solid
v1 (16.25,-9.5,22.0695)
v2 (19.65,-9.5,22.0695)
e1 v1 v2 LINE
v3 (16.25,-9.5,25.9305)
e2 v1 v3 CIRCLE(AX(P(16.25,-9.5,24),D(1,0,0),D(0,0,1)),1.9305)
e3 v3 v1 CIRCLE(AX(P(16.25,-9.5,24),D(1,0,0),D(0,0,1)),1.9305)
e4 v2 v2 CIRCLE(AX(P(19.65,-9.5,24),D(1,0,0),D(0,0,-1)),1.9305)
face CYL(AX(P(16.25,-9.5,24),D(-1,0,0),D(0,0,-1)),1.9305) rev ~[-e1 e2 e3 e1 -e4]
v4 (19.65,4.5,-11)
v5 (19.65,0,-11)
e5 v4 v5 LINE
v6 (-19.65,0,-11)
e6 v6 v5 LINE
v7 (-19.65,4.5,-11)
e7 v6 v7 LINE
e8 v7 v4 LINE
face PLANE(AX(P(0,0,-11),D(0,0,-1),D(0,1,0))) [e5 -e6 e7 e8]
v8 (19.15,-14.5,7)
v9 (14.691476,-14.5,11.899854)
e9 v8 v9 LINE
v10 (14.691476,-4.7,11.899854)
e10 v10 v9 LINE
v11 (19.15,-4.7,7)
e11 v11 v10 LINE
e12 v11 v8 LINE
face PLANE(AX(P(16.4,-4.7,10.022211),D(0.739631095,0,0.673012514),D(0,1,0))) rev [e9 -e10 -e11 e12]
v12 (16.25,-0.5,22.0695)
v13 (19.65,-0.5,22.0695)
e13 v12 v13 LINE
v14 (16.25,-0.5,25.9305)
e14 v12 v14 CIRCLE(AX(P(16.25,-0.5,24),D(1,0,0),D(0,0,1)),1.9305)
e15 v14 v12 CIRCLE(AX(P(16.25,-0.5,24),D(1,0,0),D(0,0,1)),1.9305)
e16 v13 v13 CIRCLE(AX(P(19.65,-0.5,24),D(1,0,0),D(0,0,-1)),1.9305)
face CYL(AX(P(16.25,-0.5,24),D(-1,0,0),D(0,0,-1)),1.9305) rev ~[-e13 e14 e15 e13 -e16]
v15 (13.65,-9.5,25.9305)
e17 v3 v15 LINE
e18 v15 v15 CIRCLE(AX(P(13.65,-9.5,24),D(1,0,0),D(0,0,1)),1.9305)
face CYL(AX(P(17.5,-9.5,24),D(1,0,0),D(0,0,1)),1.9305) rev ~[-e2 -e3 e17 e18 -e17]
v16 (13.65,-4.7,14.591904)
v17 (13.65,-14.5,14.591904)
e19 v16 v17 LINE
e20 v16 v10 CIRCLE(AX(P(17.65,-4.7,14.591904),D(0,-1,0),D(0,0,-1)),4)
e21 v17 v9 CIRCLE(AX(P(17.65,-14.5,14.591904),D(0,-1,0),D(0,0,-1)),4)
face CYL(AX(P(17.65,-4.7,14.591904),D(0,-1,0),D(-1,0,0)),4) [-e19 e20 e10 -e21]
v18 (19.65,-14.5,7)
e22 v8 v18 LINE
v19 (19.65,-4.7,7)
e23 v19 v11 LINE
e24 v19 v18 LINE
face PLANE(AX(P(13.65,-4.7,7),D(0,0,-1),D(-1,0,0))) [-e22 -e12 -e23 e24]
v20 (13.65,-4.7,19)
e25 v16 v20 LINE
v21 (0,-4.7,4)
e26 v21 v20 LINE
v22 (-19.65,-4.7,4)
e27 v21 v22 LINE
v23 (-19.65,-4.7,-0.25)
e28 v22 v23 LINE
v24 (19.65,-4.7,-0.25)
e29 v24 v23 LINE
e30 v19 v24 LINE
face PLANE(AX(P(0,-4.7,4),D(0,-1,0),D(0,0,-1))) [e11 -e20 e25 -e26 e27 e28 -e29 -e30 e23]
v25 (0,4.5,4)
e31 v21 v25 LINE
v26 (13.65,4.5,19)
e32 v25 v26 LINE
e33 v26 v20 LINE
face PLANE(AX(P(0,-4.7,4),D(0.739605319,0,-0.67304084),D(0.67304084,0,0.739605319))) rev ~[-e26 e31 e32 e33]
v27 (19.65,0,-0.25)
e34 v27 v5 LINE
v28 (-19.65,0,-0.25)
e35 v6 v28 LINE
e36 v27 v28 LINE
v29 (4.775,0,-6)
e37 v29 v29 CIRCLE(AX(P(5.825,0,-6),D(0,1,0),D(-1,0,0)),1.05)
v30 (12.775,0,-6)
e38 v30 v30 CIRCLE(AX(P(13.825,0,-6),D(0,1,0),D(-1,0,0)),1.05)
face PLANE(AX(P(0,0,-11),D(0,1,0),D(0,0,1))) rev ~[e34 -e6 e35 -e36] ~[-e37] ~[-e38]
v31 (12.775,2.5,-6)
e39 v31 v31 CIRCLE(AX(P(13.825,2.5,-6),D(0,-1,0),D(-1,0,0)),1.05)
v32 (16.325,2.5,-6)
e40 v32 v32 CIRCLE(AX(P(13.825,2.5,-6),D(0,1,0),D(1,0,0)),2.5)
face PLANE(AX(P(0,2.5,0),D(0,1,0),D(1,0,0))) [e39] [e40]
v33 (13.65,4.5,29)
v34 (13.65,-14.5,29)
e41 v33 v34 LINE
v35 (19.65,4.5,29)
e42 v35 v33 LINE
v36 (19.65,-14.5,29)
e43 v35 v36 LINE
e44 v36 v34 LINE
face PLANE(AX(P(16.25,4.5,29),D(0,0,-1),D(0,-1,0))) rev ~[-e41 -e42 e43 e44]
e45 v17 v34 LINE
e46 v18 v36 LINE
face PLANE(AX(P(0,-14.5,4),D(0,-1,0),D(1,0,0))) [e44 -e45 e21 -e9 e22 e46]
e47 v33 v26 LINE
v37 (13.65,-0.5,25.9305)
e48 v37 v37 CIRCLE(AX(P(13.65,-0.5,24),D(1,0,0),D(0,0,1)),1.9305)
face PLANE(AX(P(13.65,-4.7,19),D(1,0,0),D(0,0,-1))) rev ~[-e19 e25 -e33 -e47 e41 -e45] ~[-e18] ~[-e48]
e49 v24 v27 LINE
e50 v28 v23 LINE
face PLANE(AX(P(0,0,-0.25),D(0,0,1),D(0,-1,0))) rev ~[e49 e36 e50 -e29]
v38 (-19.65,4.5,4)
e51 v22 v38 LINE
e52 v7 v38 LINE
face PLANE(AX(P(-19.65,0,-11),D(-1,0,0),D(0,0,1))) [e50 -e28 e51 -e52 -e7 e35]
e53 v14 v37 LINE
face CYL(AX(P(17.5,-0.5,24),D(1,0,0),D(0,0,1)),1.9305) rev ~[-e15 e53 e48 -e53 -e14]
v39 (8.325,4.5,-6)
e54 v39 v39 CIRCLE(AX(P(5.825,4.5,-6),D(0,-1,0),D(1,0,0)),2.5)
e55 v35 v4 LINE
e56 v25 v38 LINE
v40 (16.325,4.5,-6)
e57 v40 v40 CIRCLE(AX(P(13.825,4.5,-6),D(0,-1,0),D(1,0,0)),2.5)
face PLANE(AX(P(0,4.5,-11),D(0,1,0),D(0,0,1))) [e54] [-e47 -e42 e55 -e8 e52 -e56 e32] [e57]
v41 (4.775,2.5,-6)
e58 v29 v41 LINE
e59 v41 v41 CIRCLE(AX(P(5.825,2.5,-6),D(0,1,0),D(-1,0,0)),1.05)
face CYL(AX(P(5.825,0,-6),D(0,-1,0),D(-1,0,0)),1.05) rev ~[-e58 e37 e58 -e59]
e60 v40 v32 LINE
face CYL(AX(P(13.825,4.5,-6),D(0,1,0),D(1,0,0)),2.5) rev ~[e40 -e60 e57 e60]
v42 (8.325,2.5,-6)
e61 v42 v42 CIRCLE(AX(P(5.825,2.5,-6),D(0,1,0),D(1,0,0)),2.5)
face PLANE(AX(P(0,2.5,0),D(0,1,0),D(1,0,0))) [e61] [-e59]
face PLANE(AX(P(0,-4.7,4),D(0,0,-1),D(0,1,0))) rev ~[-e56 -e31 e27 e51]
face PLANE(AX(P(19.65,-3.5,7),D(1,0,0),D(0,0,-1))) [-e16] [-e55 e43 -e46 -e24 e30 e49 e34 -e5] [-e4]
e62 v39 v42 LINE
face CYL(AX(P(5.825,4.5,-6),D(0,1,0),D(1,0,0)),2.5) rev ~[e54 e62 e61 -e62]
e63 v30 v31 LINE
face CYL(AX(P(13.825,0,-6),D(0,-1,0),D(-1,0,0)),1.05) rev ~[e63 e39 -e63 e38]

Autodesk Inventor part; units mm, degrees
ref_plane "YZ Plane" through (0, 0, 0) normal (1, 0, 0) x (0, 1, 0)
ref_plane "XZ Plane" through (0, 0, 0) normal (0, 1, 0) x (-1, 0, 0)
ref_plane "XY Plane" through (0, 0, 0) normal (0, 0, 1) x (1, 0, 0)
sketch "Sketch1" plane through (0, 0, 0) normal (0, 1, 0) x (-1, 0, 0)
  line L0 (0, 0) -> (-19.65, 0)
  line L1 (-19.65, 0) -> (-19.65, -12)
  line L2 (-19.65, -12) -> (0, -12)
  line L3 (0, -12) -> (0, 0)
  line L4 (0, 0) -> (0, -6)
  line L5 (0, -6) -> (-5.825, -6)
  line L6 (-5.825, -6) -> (-13.825, -6)
  circle A0 centre (-5.825, -6) radius 1.05
  circle A1 centre (-13.825, -6) radius 1.05
  dimension "d0" = 19.65
  dimension "d1" = 12
  dimension "d2" = 6
  dimension "d3" = 5.825
  dimension "d4" = 8
  dimension "d5" = 2.1
  dimension "d6" = 2.1
extrude "Extrusion1" add sketch "Sketch1" along normal blind 4.5
sketch "Sketch2" plane through (0, 4.5, 0) normal (0, 1, 0) x (1, 0, 0)
  line L0 (0, 0) -> (19.65, 0) projected
  line L1 (0, 0) -> (0, 6)
  line L2 (0, 12) -> (0, 0) projected
  line L3 (0, 6) -> (5.825, 6)
  line L4 (5.825, 6) -> (13.825, 6)
  circle A0 centre (5.825, 6) radius 2.5
  circle A1 centre (13.825, 6) radius 2.5
  dimension "d9" = 5.825
  dimension "d10" = 8
  dimension "d11" = 5
  dimension "d12" = 5
extrude "Extrusion2" cut sketch "Sketch2" against normal blind 2
sketch "Sketch3" plane through (0, 4.5, 0) normal (0, 1, 0) x (1, 0, 0)
  line L0 (19.65, 12) -> (0, 12) projected
  line L1 (0, 0) -> (3, 0)
  line L2 (3, 0) -> (3, 12)
  line L3 (3, 12) -> (0, 12)
  line L4 (0, 12) -> (0, 0)
  dimension "d15" = 3
extrude "Extrusion3" add sketch "Sketch3" along normal blind 11.5
sketch "Sketch4" plane through (0, 16, 0) normal (0, 1, 0) x (1, 0, 0)
  line L0 (0, 0) -> (3, 0) projected
  line L1 (0, 0) -> (3, 0)
  line L2 (3, 0) -> (3, 1)
  line L3 (3, 0) -> (3, 12) projected
  line L4 (3, 1) -> (2, 1)
  line L5 (2, 1) -> (2, 11)
  line L6 (2, 11) -> (3, 11)
  line L7 (3, 1) -> (3, 11)
  dimension "d18" = 1
  dimension "d19" = 1
  dimension "d20" = 10
extrude "Extrusion4" cut sketch "Sketch4" against normal blind 11.5
sketch "Sketch6" plane through (0, 0, 0) normal (0, 0, 1) x (1, 0, 0)
  line L0 (0, 0) -> (19.65, 0) projected
  line L1 (0, 0) -> (5, 0)
  line L2 (5, 0) -> (5, 4.5)
  line L3 (3.325, 4.5) -> (8.325, 4.5) projected
  line L4 (19.65, 0) -> (19.65, 4.5) projected
  line L5 (19.65, 4.5) -> (19.65, 0)
  line L6 (19.65, 0) -> (5, 0)
  line L7 (5, 4.5) -> (19.65, 4.5)
  line L8 (19.65, 0) -> (5, 0)
  line L9 (19.65, 4.5) -> (19.65, -3.5)
  line L10 (5, 4.5) -> (-3, 4.5)
  line L11 (3, 4.5) -> (19.65, 4.5) projected
  line L12 (5, 4.5) -> (5, -3.5)
  line L13 (5, -3.5) -> (19.65, -3.5)
  dimension "d24" = 5
  dimension "d25" = 8
  dimension "d26" = 8
  dimension "d27" = 8
extrude "Extrusion5" add sketch "Sketch6" along normal blind 2
sketch "Sketch7" plane through (0, 0, 2) normal (0, 0, 1) x (1, 0, 0)
  line L0 (5, 0) -> (5, -3.5) projected
  line L1 (5, -3.5) -> (11, -3.5)
  line L2 (11, -3.5) -> (11, 4.5)
  line L3 (11, 4.5) -> (5, 4.5)
  line L4 (5, 4.5) -> (5, -3.5)
  line L5 (5, -3.5) -> (19.65, -3.5) projected
  line L6 (5, -3.5) -> (11, -3.5)
  line L7 (11, -3.5) -> (11, -14.5)
  line L8 (11, -14.5) -> (5, -14.5)
  line L9 (5, -14.5) -> (5, -3.5)
  point P0 (0, 0)
  dimension "d30" = 6
  dimension "d31" = 8
  dimension "d32" = 6
  dimension "d33" = 11
extrude "Extrusion6" add sketch "Sketch7" along normal blind 27
sketch "Sketch8" plane through (11, -14.5, 2) normal (1, 0, 0) x (0, 0, -1)
  line L0 (0, 11) -> (0, 0) projected
  line L1 (0, 0) -> (-27, 0)
  line L2 (0, 0) -> (-27, 0) projected
  line L3 (-27, 0) -> (-27, 5)
  line L4 (2, 19) -> (-27, 19) projected
  circle A0 centre (-27, 5) radius 2
  line L5 (0, 19) -> (-27, 19)
  line L6 (-27, 19) -> (-27, 14)
  circle A1 centre (-27, 14) radius 2
  line L7 (-27, 14) -> (-22, 14)
  line L8 (-27, 5) -> (-22, 5)
  circle A2 centre (-22, 14) radius 1.9305
  circle A3 centre (-22, 5) radius 1.9305
  point P0 (2, 14.5)
  point P1 (-25, 14)
  point P2 (-27, 16)
  point P3 (-25, 5)
  point P4 (-27, 3)
  dimension "d36" = 27
  dimension "d37" = 5
  dimension "d39" = 4
  dimension "d41" = 27
  dimension "d42" = 5
  dimension "d43" = 4
  dimension "d44" = 5
  dimension "d45" = 5
  dimension "d46" = 3.861
  dimension "d47" = 3.861
sketch "Sketch10" plane through (11, -14.5, 2) normal (1, 0, 0) x (0, 0, -1)
  line L0 (0, 0) -> (-27, 0) projected
  line L1 (0, 0) -> (-5, 0)
  line L2 (-5, 0) -> (-5, 11)
  line L3 (-5, 11) -> (0, 11)
  line L4 (0, 11) -> (0, 0)
  point P0 (2, 14.5)
  point P1 (-5, 0)
  dimension "d52" = 5
  dimension "d53" = 11
extrude "Extrusion9" cut sketch "Sketch10" against normal blind 20
sketch "Sketch11" plane through (11, -3.5, 2) normal (1, 0, 0) x (0, 0, -1)
  line L0 (-27, 8) -> (0, 8)
  line L1 (0, 8) -> (0, -11)
  line L2 (0, -11) -> (-27, -11)
  line L3 (-27, -11) -> (-27, 8)
  line L4 (-5, 0) -> (0, 0) projected
  line L5 (-5, 0) -> (0, 0)
  line L6 (0, 0) -> (0, -11)
  line L7 (0, -11) -> (-5, -11)
  line L8 (-5, -11) -> (-5, 0)
  point P0 (2, 3.5)
  dimension "d56" = 27
  dimension "d57" = 19
extrude "Extrusion10" add sketch "Sketch11" along normal blind 16 contours L0 L1 L4 L8 L2 L3
sketch "Sketch13" plane through (5, -3.5, 0) normal (-1, 0, 0) x (0, 0, 1)
  line L0 (0, 3.5) -> (0, 8) projected
  line L1 (0, 8) -> (30.196, 8)
  line L2 (30.196, 8) -> (30.196, -11.8084)
  line L3 (30.196, -11.8084) -> (0, -11.8084)
  line L4 (0, -11.8084) -> (0, 8)
extrude "Extrusion12" cut sketch "Sketch13" against normal blind 12.5
extrude "Extrusion13" cut sketch "Sketch8" along normal blind 30 contours A2 | A3
sketch "Sketch14" plane through (0, 0, -12) normal (-1, 0, 0) x (0, 0, 1)
  line L0 (12, 4.5) -> (12, 16) projected
  line L1 (12, 4.5) -> (16, 4.5)
  line L2 (14, 4.5) -> (41, 4.5) projected
  line L3 (12, 4.5) -> (12, 0) projected
  line L4 (16, 4.5) -> (12, 4.5)
  line L5 (12, 4.5) -> (12, 0)
  line L6 (12, 0) -> (16, 0)
  line L7 (16, 0) -> (16, 4.5)
  line L8 (16, 0) -> (12, 0)
  line L9 (12, 0) -> (12, -3.5)
  line L10 (12, -3.5) -> (16, -3.5)
  line L11 (16, -3.5) -> (16, 0)
  dimension "d68" = 4
  dimension "d69" = 3.5
extrude "Extrusion14" add sketch "Sketch14" against normal blind 27
sketch "Sketch15" plane through (27, -3.5, 2) normal (1, 0, 0) x (0, 0, -1)
  line L0 (-27.7224, 9.1153) -> (2, 9.1153)
  line L1 (2, 9.1153) -> (2, -11.9629)
  line L2 (2, -11.9629) -> (-27.7224, -11.9629)
  line L3 (-27.7224, -11.9629) -> (-27.7224, 9.1153)
  point P0 (2, 3.5)
extrude "Extrusion15" cut sketch "Sketch15" against normal blind 3.5
sketch "Sketch16" plane through (0, 0, 0) normal (0, 0, -1) x (-1, 0, 0)
  line L0 (-23.5, 4.5) -> (-23.5, -3.5) projected
  line L1 (-19.65, 0) -> (0, 0) projected
  line L2 (-23.5, 4.5) -> (-19.65, 4.5)
  line L3 (-19.65, 4.5) -> (-19.65, 0)
  line L4 (-19.65, 0) -> (-23.5, 0)
  line L5 (-23.5, 0) -> (-23.5, 4.5)
  line L6 (0, -3.5) -> (-23.5, -3.5) projected
  line L7 (-23.5, -3.5) -> (0, -3.5)
  line L8 (0, -3.5) -> (0, 0)
  line L9 (0, 0) -> (-23.5, 0)
  line L10 (-23.5, 0) -> (-23.5, -3.5)
extrude "Extrusion16" cut sketch "Sketch16" against normal blind 0.25
chamfer "Chamfer2" distance 11.5 angle 22.5 1 edges at (3, 4.5, -0.5) measured on face at (3, 8.3333, -0.6667)
chamfer "Chamfer3" distance 11.5 angle 22.5 1 edges at (3, 4.5, -11.5) measured on face at (3, 8.3333, -11.3333)
sketch "Sketch17" plane through (17.5, -3.5, 0) normal (-1, 0, 0) x (0, 0, 1)
  line L0 (4, 8) -> (0, 8) projected
  line L1 (4, 8) -> (29, 8) projected
  line L2 (4, 8) -> (29, 8)
  line L3 (29, -11) -> (7, -11) projected
  line L4 (29, 8) -> (29, -11)
  line L5 (29, -11) -> (7, -11)
  line L6 (7, -11) -> (7, 0) projected
  line L7 (7, -11) -> (7, 0)
  line L8 (7, 0) -> (4, 0) projected
  line L9 (7, 0) -> (4, 0)
  line L10 (4, 0) -> (4, 8) projected
  line L11 (4, 0) -> (4, 8)
  circle A0 centre (24, 3) radius 1.9305 projected
  circle A1 centre (24, 3) radius 1.9305
  circle A2 centre (24, -6) radius 1.9305 projected
  circle A3 centre (24, -6) radius 1.9305
  point P0 (0, 3.5)
extrude "Extrusion17" add sketch "Sketch17" along normal blind 7.75
sketch "Sketch19" plane through (19.65, 0, -12) normal (1, 0, 0) x (0, 0, -1)
  line L0 (3.0047, 17.6779) -> (-43.6886, 17.6779)
  line L1 (-43.6886, 17.6779) -> (-43.6886, -24.1526)
  line L2 (-43.6886, -24.1526) -> (3.0047, -24.1526)
  line L3 (3.0047, -24.1526) -> (3.0047, 17.6779)
  point P0 (-12, 0)
extrude "Extrusion18" cut sketch "Sketch19" along normal blind 7.75
sketch "Sketch20" plane through (19.65, 0, -12) normal (1, 0, 0) x (0, 0, -1)
  line L0 (-16, -3.5) -> (-19, -3.5) projected
  line L1 (-41, 4.5) -> (-16, 4.5) projected
  line L2 (-16, -3.5) -> (-41, -3.5)
  line L3 (-41, -3.5) -> (-41, 4.5)
  line L4 (-41, 4.5) -> (-16, 4.5)
  line L5 (-16, 4.5) -> (-16, -3.5)
  line L6 (-19, -3.5) -> (-19, -14.5) projected
  line L7 (0, 4.5) -> (-41, 4.5) projected
  line L8 (-19, -14.5) -> (-41, -14.5)
  line L9 (-41, -14.5) -> (-41, 4.5)
  line L10 (-41, 4.5) -> (-19, 4.5)
  line L11 (-19, 4.5) -> (-19, -14.5)
  point P0 (-12, 0)
extrude "Extrusion19" cut sketch "Sketch20" against normal blind 3.4
sketch "Sketch22" plane through (9.75, -3.5, 0) normal (-1, 0, 0) x (0, 0, 1)
  line L0 (29, 8) -> (4, 8) projected
  line L1 (29, -11) -> (29, 8) projected
  line L2 (4, 8) -> (29, 8)
  line L3 (29, 8) -> (29, -11)
  line L4 (29, -11) -> (4, -11)
  line L5 (4, -11) -> (4, 8)
  point P0 (0, 3.5)
extrude "Extrusion21" cut sketch "Sketch22" against normal blind 0.5
chamfer "Chamfer6" distance 6 angle 45 1 edges at (10.25, 0.5, 4)
sketch "Sketch23" plane through (10.25, -3.5, 0) normal (-1, 0, 0) x (0, 0, 1)
  line L0 (0.25, 0) -> (4, 0) projected
  line L1 (29, -11) -> (0.25, -11)
  line L2 (0.25, -11) -> (0.25, 0)
  line L3 (0.25, 0) -> (29, 0)
  line L4 (29, 0) -> (29, -11)
  point P0 (0, 3.5)
extrude "Extrusion22" cut sketch "Sketch23" along normal blind 6
chamfer "Chamfer7" distance 3 angle 45 1 edges at (10.25, -9, 7)
sketch "Sketch24" plane through (2, 4.5, -11) normal (0, 0, 1) x (1, 0, 0)
  line L0 (0, 11.5) -> (0, 0) projected
  line L1 (0, 11.5) -> (1, 11.5) projected
  line L2 (0, 11.5) -> (1, 11.5)
  line L3 (1, 11.5) -> (5.7635, 0) projected
  line L4 (1, 11.5) -> (5.7635, 0)
  line L5 (5.7635, 0) -> (0, 0)
  line L6 (0, 0) -> (0, 11.5)
  point P0 (-2, -4.5)
extrude "Extrusion23" add sketch "Sketch24" along normal blind 1
sketch "Sketch25" plane through (19.65, 0, -12) normal (0, 0, -1) x (-1, 0, 0)
  line L0 (11.8865, 4.5) -> (16.65, 16) projected
  line L1 (11.8865, 4.5) -> (21.5602, 4.5)
  line L2 (21.5602, 4.5) -> (21.5602, 16.6717)
  line L3 (21.5602, 16.6717) -> (11.8865, 16.6717)
  line L4 (11.8865, 16.6717) -> (11.8865, 4.5)
  point P0 (19.65, 0)
extrude "Extrusion24" cut sketch "Sketch25" against normal blind 1
sketch "Sketch26" plane through (19.65, 0, -12) normal (0, 0, -1) x (-1, 0, 0)
  line L0 (23.0227, -5.5896) -> (-3.5888, -5.5896)
  line L1 (-3.5888, -5.5896) -> (-3.5888, 1.5983)
  line L2 (23.0227, 1.5983) -> (23.0227, -5.5896)
  line L3 (23.0227, -5.5896) -> (-3.178, -5.5896)
  line L4 (-3.178, -5.5896) -> (-3.178, 11.4907)
  line L5 (-3.178, 11.4907) -> (23.0227, 11.4907)
  line L6 (23.0227, 11.4907) -> (23.0227, -5.5896)
  point P0 (19.65, 0)
extrude "Extrusion25" cut sketch "Sketch26" against normal blind 1
sketch "Sketch27" plane through (0, 0, 0.25) normal (0, 0, -1) x (-1, 0, 0)
  line L0 (-19.65, 0) -> (0, 0) projected
  line L1 (-19.65, -3.5) -> (-16.25, -3.5) projected
  line L2 (0, 0) -> (-19.65, 0)
  line L3 (-19.65, 0) -> (-19.65, -3.5)
  line L4 (-19.65, -3.5) -> (0, -3.5)
  line L5 (0, -3.5) -> (0, 0)
extrude "Extrusion26" add sketch "Sketch27" along normal blind 0.25
sketch "Sketch28" plane through (0, 0, 0) normal (0, 0, -1) x (-1, 0, 0)
  line L0 (0, 0) -> (-19.65, 0) projected
  line L1 (-19.65, 0) -> (-19.65, -3.5) projected
  line L2 (0, 0) -> (-19.65, 0)
  line L3 (-19.65, 0) -> (-19.65, -3.5)
  line L4 (-19.65, -3.5) -> (0, -3.5)
  line L5 (0, -3.5) -> (0, 0)
extrude "Extrusion27" add sketch "Sketch28" along normal blind 0.25
sketch "Sketch29" plane through (16.25, 0, -12) normal (1, 0, 0) x (0, 0, -1)
  line L0 (-16, -3.5) -> (-16, 4.5) projected
  line L1 (-19, -14.5) -> (-41, -14.5) projected
  line L2 (-16, 4.5) -> (-41, 4.5)
  line L3 (-41, 4.5) -> (-41, -14.5)
  line L4 (-41, -14.5) -> (-16, -14.5)
  line L5 (-16, -14.5) -> (-16, 4.5)
  line L6 (-19, -3.5) -> (-19, -14.5) projected
  line L7 (-19, -3.5) -> (-16, -3.5)
  line L8 (-16, -3.5) -> (-16, -14.5)
  line L9 (-16, -14.5) -> (-19, -14.5)
  line L10 (-19, -14.5) -> (-19, -3.5)
  circle A0 centre (-36, -0.5) radius 1.9305 projected
  circle A1 centre (-36, -0.5) radius 1.9305
  circle A2 centre (-36, -9.5) radius 1.9305 projected
  circle A3 centre (-36, -9.5) radius 1.9305
  point P0 (-12, 0)
extrude "Extrusion28" add sketch "Sketch29" along normal blind 3.4 contours L7 L6 L1 L3 L2 L0
sketch "Sketch30" plane through (0, -3.5, 4) normal (0, -1, 0) x (1, 0, 0)
  line L0 (19.65, 3) -> (19.65, -4.25) projected
  line L1 (0, -15) -> (0, -4.25) projected
  line L2 (0, 3) -> (0, -4.25)
  line L3 (0, -4.25) -> (19.65, -4.25)
  line L4 (19.65, -4.25) -> (19.65, 3)
  line L5 (10.25, 6) -> (13.25, 3) projected
  line L6 (13.25, 3) -> (10.25, 6)
  line L7 (10.25, 6) -> (7.25, 3)
  line L8 (10.25, 6) -> (4.25, 0) projected
  line L9 (0, 0) -> (4.25, 0) projected
  line L10 (7.25, 3) -> (4.25, 0)
  line L11 (19.65, 3) -> (13.25, 3)
  line L12 (7.25, 3) -> (0, 3)
  point P0 (0, -4)
extrude "Extrusion29" add sketch "Sketch30" along normal blind 1.2 contours L0 L3 L2 L9 L8 L7 L5 L11
sketch "Sketch31" plane through (10.25, -3.5, 0) normal (-1, 0, 0) x (0, 0, 1)
  line L0 (29, 8) -> (29, -11) projected
  line L1 (29, -11) -> (10, -11) projected
  line L2 (29, 8) -> (19, 8)
  line L3 (19, 8) -> (19, -11)
  line L4 (19, -11) -> (29, -11)
  line L5 (29, -11) -> (29, 8)
  point P0 (0, 3.5)
  dimension "d126" = 10
extrude "Extrusion30" cut sketch "Sketch31" against normal blind 3.4
sketch "Sketch32" plane through (0, 4.5, 0) normal (0, 1, 0) x (1, 0, 0)
  line L0 (13.65, -19) -> (10.25, -19) projected
  line L1 (10.25, -19) -> (10.25, -10) projected
  line L2 (13.65, -19) -> (10.25, -10)
  line L3 (10.25, -10) -> (7.9334, -20.7068)
  line L4 (7.9334, -20.7068) -> (13.65, -19)
  point P0 (0, 0)
extrude "Extrusion31" cut sketch "Sketch32" against normal blind 20 contours L0 L1 L2
sketch "Sketch38" plane through (0, -4.7, 4) normal (0, -1, 0) x (1, 0, 0)
  line L0 (13.65, 15) -> (13.65, 3)
  line L1 (13.25, 3) -> (19.65, 3) projected
  line L2 (13.65, 3) -> (6.6933, 3)
  line L3 (10.25, 6) -> (13.65, 15) projected
  line L4 (6.6933, 3) -> (13.65, 15)
  point P0 (0, -4)
extrude "Extrusion35" cut sketch "Sketch38" along normal blind 20
sketch "Sketch39" plane through (0, -4.7, 4) normal (0, -1, 0) x (1, 0, 0)
  line L0 (10.25, 6) -> (13.65, 15) projected
  line L1 (10.25, 6) -> (10.9568, 7.8709)
  line L2 (10.9568, 7.8709) -> (13.65, 7.8709)
  line L3 (13.65, 3) -> (13.65, 15) projected
  line L4 (13.65, 3) -> (10.9568, 3)
  line L5 (10.9568, 3) -> (10.9568, 7.8709)
  line L6 (10.9568, 7.8709) -> (13.65, 7.8709)
  line L7 (13.65, 7.8709) -> (13.65, 3)
  point P0 (0, -4)
  dimension "d150" = 2
extrude "Extrusion36" add sketch "Sketch39" along normal blind 9.8 contours L2 L3 L4 L5
sketch "Sketch40" plane through (0, -4.7, 4) normal (0, -1, 0) x (1, 0, 0)
  line L0 (10.25, 6) -> (10.9568, 7.8709) projected
  line L1 (13.65, 25) -> (13.65, 7.8709) projected
  line L2 (10.9568, 7.8709) -> (13.65, 7.8709)
  line L3 (13.65, 15) -> (13.65, 25) projected
  line L4 (13.65, 7.8709) -> (13.65, 15)
  line L5 (10.9568, 7.8709) -> (13.65, 15) projected
  line L6 (13.65, 15) -> (10.9568, 7.8709)
  point P0 (0, -4)
extrude "Extrusion37" add sketch "Sketch40" along normal blind 9.8
sketch "Sketch42" plane through (0, -4.7, 4) normal (0, -1, 0) x (1, 0, 0)
  line L0 (4.25, 0) -> (0, 0) projected
  line L1 (10.25, 6) -> (13.65, 15) projected
  line L2 (0, 0) -> (13.65, 15)
  line L3 (13.65, 15) -> (13.65, 4.5)
  line L4 (13.65, 4.5) -> (6.0124, 0)
  line L5 (0, 0) -> (4.25, 0) projected
  line L6 (6.0124, 0) -> (0, 0)
  point P0 (0, -4)
extrude "Extrusion38" add sketch "Sketch42" against normal blind 9.2
sketch "Sketch45" plane through (19.65, -14.5, 7) normal (0, -1, 0) x (1, 0, 0)
  line L0 (-6, 12) -> (-19.65, -3) projected
  line L1 (-6, 12) -> (-11.8966, 12)
  line L2 (-11.8966, 12) -> (-11.8966, -1.0489)
  line L3 (-11.8966, -1.0489) -> (-6, -1.0489)
  line L4 (-6, -1.0489) -> (-6, 12)
  point P0 (-19.65, -7)
  point P1 (-11.8966, 5.5202)
extrude "Extrusion40" cut sketch "Sketch45" against normal blind 9.8 contours L4 L3 L2 L0
chamfer "Chamfer12" distance 5.5 angle 47.7 1 edges at (13.65, -9.6, 7) measured on face at (17.65, -11.2333, 7)
fillet "Fillet6" radius 4 1 edges at (13.65, -9.6, 13.0444)
sketch "Sketch46" plane through (0, 4.5, 0) normal (-1, 0, 0) x (0, 0, 1)
  line L0 (-11, 0) -> (29, 0) projected
  line L1 (-11, 0) -> (2.4776, 0)
  line L2 (2.4776, 0) -> (2.4776, 14.1747)
  line L3 (2.4776, 14.1747) -> (-11, 14.1747)
  line L4 (-11, 14.1747) -> (-11, 0)
  point P0 (0, -4.5)
  point P1 (2.4776, 0)
extrude "Extrusion41" cut sketch "Sketch46" against normal blind 40
sketch "Sketch47" plane through (0, 0, -11) normal (-1, 0, 0) x (0, 0, 1)
  line L0 (10.75, 0) -> (10.75, -4.7) projected
  line L1 (0, 0) -> (10.75, 0) projected
  line L2 (10.75, -4.7) -> (0, -4.7)
  line L3 (0, -4.7) -> (0, 0)
  line L4 (0, 0) -> (10.75, 0)
  line L5 (10.75, 0) -> (10.75, -4.7)
  line L6 (0, 0) -> (0, 4.5) projected
  line L7 (15, -4.7) -> (15, 4.5) projected
  line L8 (0, 4.5) -> (15, 4.5)
  line L9 (15, 4.5) -> (15, -4.7)
  line L10 (15, -4.7) -> (0, -4.7)
  line L11 (0, -4.7) -> (0, 4.5)
  point P0 (11, 0)
  point P1 (15, 4.5)
ref_plane "Work Plane1" through (0, 0, -11) normal (-1, 0, 0) x (0, 0, 1)
extrude "Extrusion42" add sketch "Sketch47" along normal blind 19.65 contours L1 L6 L8 L7 L10 L0
properties part number "Non_compliant_plate2"
